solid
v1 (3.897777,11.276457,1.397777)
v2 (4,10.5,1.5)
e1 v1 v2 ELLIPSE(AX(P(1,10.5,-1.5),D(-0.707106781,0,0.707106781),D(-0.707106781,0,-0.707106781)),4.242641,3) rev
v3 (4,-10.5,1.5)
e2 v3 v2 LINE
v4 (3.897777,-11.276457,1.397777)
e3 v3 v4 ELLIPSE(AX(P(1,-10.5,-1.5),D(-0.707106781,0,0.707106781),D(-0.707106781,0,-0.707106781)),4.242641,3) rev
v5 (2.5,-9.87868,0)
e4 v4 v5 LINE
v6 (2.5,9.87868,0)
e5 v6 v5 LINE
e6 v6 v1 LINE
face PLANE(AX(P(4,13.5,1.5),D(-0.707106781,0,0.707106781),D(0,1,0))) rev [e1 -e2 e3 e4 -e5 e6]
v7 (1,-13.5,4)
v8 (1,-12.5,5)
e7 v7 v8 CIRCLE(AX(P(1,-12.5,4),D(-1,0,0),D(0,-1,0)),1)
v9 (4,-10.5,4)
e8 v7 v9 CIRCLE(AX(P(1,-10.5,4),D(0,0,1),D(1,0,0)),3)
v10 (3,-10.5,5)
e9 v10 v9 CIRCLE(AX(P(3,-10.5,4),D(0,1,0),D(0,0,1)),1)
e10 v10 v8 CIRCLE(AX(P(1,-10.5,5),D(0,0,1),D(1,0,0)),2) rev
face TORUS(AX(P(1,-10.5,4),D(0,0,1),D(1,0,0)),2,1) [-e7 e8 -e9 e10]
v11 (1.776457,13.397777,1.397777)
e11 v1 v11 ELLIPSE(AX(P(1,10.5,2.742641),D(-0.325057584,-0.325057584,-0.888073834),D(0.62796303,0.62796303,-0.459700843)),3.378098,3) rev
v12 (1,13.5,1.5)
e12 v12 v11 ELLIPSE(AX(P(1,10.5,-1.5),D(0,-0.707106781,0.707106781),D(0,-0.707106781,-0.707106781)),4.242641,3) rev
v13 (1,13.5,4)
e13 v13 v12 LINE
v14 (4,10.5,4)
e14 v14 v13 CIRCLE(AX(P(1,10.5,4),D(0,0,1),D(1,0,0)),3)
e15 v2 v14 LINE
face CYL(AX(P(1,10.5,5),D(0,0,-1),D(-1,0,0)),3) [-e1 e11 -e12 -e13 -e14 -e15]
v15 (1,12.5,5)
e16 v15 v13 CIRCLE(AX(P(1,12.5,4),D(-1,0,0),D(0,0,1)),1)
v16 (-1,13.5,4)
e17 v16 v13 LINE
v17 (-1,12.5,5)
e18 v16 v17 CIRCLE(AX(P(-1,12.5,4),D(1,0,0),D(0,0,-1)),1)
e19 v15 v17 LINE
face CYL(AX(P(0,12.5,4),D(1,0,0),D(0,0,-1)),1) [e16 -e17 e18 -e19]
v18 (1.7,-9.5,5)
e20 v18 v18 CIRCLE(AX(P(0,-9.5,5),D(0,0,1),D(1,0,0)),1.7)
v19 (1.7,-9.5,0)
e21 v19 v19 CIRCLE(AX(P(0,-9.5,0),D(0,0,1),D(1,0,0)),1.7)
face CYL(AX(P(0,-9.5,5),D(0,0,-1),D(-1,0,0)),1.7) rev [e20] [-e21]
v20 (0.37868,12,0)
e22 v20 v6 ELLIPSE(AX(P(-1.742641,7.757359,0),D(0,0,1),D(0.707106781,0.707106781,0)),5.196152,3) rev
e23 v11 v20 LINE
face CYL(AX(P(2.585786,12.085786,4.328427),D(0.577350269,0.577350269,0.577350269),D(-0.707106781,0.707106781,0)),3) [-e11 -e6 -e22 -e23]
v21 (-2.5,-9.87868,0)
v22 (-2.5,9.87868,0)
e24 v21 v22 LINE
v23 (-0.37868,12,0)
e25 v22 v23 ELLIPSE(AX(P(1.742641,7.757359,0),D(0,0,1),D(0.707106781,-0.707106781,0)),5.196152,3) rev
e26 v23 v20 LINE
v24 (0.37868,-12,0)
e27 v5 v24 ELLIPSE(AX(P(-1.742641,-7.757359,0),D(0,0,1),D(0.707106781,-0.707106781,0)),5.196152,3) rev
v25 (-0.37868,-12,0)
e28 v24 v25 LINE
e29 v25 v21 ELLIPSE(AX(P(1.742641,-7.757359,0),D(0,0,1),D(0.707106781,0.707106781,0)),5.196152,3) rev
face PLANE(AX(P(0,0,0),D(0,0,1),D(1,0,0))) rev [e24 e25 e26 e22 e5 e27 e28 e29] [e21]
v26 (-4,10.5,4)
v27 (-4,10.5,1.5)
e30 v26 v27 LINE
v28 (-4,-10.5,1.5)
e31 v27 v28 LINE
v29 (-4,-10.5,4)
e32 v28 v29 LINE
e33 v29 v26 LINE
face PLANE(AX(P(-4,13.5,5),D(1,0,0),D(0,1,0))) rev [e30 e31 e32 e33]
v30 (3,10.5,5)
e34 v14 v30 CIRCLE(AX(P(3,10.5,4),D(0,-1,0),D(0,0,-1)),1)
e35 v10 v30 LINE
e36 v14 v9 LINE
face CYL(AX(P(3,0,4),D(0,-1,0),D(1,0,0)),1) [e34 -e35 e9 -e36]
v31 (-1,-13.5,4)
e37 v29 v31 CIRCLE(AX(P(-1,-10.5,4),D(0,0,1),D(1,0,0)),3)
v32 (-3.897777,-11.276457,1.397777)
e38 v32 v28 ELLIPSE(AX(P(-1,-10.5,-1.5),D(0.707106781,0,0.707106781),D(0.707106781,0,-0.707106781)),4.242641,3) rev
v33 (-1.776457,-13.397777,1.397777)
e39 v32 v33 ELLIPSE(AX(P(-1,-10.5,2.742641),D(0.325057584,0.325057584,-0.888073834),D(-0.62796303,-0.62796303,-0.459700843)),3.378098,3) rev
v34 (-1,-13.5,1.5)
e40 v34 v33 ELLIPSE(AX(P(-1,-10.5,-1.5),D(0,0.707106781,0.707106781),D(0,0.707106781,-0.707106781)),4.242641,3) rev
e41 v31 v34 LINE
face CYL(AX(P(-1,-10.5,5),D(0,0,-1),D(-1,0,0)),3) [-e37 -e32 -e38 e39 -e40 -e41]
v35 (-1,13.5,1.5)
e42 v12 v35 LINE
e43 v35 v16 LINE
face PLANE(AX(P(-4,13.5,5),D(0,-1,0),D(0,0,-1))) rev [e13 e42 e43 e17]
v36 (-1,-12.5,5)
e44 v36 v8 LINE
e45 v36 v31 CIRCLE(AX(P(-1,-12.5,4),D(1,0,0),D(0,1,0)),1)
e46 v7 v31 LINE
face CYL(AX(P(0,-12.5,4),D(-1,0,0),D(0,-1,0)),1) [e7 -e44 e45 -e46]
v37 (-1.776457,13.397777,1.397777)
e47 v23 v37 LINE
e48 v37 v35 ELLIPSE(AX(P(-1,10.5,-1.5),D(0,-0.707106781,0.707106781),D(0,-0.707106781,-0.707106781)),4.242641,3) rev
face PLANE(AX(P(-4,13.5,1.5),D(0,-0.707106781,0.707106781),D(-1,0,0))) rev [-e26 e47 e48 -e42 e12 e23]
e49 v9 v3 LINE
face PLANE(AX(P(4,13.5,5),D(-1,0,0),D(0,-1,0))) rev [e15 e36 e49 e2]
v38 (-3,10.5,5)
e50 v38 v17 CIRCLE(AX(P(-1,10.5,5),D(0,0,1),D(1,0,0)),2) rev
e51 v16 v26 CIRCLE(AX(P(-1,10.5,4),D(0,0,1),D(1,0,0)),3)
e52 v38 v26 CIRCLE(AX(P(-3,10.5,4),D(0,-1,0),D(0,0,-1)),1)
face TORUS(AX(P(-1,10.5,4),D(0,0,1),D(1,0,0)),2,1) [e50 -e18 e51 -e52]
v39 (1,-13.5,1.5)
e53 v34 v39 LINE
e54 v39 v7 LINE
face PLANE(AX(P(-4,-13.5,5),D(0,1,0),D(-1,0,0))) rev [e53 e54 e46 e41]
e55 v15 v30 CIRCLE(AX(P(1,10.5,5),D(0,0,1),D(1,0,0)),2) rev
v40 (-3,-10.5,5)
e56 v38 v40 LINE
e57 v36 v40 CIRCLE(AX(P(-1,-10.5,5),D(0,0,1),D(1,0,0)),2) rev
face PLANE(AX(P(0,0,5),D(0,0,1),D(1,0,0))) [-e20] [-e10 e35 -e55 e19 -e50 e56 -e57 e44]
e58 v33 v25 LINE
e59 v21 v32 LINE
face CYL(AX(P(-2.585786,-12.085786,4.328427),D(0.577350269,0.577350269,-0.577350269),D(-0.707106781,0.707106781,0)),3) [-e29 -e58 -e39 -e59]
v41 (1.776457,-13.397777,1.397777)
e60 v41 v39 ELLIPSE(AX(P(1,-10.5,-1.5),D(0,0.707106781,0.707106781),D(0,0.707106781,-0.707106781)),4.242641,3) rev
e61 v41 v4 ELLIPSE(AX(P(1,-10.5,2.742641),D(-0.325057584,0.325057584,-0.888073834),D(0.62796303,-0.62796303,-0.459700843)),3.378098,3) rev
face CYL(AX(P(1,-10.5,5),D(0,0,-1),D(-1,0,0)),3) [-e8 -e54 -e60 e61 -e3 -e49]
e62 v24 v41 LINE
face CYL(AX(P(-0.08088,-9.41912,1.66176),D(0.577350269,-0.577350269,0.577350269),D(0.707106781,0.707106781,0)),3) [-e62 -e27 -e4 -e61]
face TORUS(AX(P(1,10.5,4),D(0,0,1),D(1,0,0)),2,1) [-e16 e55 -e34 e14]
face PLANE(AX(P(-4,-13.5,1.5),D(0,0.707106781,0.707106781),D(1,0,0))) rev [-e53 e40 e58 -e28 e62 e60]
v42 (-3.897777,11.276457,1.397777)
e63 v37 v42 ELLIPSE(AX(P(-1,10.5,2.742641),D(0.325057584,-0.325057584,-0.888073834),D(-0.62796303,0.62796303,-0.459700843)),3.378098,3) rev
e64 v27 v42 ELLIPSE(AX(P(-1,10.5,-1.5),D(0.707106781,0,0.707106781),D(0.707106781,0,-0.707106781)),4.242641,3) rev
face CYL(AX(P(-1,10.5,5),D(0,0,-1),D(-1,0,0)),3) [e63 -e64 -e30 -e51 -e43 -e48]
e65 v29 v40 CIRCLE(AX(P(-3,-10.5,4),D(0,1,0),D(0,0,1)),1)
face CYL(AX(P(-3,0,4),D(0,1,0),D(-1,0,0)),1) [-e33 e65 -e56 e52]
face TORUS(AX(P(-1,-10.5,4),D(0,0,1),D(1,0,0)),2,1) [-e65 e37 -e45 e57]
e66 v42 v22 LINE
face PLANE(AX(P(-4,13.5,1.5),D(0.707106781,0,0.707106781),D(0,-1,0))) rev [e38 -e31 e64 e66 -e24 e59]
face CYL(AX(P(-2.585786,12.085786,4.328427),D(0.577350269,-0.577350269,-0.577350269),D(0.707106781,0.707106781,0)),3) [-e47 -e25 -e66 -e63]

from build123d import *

# Parameters (mm, degrees)
SKETCH1_W           = 8
SKETCH1_H           = 27
SKETCH1_R           = 1.7
BOSS_EXTRUDE1_DEPTH = 5
CHAMFER1_SIZE       = 1.5
FILLET1_R           = 1
FILLET2_R           = 3


with BuildPart() as part:
    # Sketch1 → Boss-Extrude1 (new body)
    with BuildSketch(Plane.XY):
        Rectangle(SKETCH1_W, SKETCH1_H)
        with Locations((0, -9.5)):
            Circle(SKETCH1_R, mode=Mode.SUBTRACT)
    extrude(amount=BOSS_EXTRUDE1_DEPTH)

    # Chamfer1
    chamfer1_edges = [part.edges().sort_by_distance(p)[0] for p in [
        (0, -13.5, 0),
        (-4, 0, 0),
        (0, 13.5, 0),
        (4, 0, 0),
    ]]
    chamfer(chamfer1_edges, length=CHAMFER1_SIZE)

    # Fillet1
    fillet1_edges = [part.edges().sort_by_distance(p)[0] for p in [
        (-4, 0, 5),
        (0, -13.5, 5),
        (4, 0, 5),
        (0, 13.5, 5),
    ]]
    fillet(fillet1_edges, radius=FILLET1_R)

    # Fillet2
    # the kernel refuses this fillet: 3 mm, written as the material it takes off along each edge
    with BuildSketch(Plane(origin=(-1, 10.5, 5), x_dir=(0, 1, 0), z_dir=(1, 0, 0))) as fillet2_piece_1:
        with BuildLine():
            CenterArc((2, -1), 1, 0, 90)
            Line((3, -1), (3, 0))
            Line((3, 0), (2, 0))
        make_face()
    revolve(axis=Axis((-1, 10.5, 5), (0, 0, 1)), revolution_arc=90, mode=Mode.SUBTRACT)
    with BuildSketch(Plane(origin=(1, 10.5, 5), x_dir=(1, 0, 0), z_dir=(0, -1, 0))) as fillet2_piece_2:
        with BuildLine():
            CenterArc((2, -1), 1, 0, 90)
            Line((3, -1), (3, 0))
            Line((3, 0), (2, 0))
        make_face()
    revolve(axis=Axis((1, 10.5, 5), (0, 0, 1)), revolution_arc=90, mode=Mode.SUBTRACT)
    with BuildSketch(Plane(origin=(-1, -10.5, 5), x_dir=(-1, 0, 0), z_dir=(0, 1, 0))) as fillet2_piece_3:
        with BuildLine():
            CenterArc((2, -1), 1, 0, 90)
            Line((3, -1), (3, 0))
            Line((3, 0), (2, 0))
        make_face()
    revolve(axis=Axis((-1, -10.5, 5), (0, 0, 1)), revolution_arc=90, mode=Mode.SUBTRACT)
    with BuildSketch(Plane(origin=(1, -10.5, 5), x_dir=(0, -1, 0), z_dir=(-1, 0, 0))) as fillet2_piece_4:
        with BuildLine():
            CenterArc((2, -1), 1, 0, 90)
            Line((3, -1), (3, 0))
            Line((3, 0), (2, 0))
        make_face()
    revolve(axis=Axis((1, -10.5, 5), (0, 0, 1)), revolution_arc=90, mode=Mode.SUBTRACT)
    with BuildSketch(Plane(origin=(-6.5, 16, 4), x_dir=(0.816496580927726, 0.40824829046386274, 0.40824829046386324), z_dir=(0.5773502691896258, -0.5773502691896258, -0.5773502691896258)), Plane(origin=(-6.5, -16, 4), x_dir=(-0.4082482904638628, 0.816496580927726, 0.40824829046386335), z_dir=(0.5773502691896257, 0.5773502691896258, -0.5773502691896257))) as fillet2_piece_5:
        with BuildLine():
            CenterArc((FILLET2_R * 0.57735026919, FILLET2_R), FILLET2_R, 210, 60)
            Line((-FILLET2_R * 0.288675134595, FILLET2_R * 0.5), (0, 0))
            Line((0, 0), (FILLET2_R * 0.57735026919, 0))
        make_face()
    extrude(amount=11.258330249, mode=Mode.SUBTRACT)
    with BuildSketch(Plane(origin=(6.5, 16, 4), x_dir=(-0.8164965809277261, 0.4082482904638628, 0.4082482904638633), z_dir=(-0.5773502691896258, -0.5773502691896258, -0.5773502691896258)), Plane(origin=(6.5, -16, 4), x_dir=(0.4082482904638627, 0.8164965809277261, 0.4082482904638632), z_dir=(-0.5773502691896258, 0.5773502691896257, -0.5773502691896258))) as fillet2_piece_6:
        with BuildLine():
            CenterArc((FILLET2_R * 0.57735026919, -FILLET2_R), FILLET2_R, 90, 60)
            Line((-FILLET2_R * 0.288675134595, -FILLET2_R * 0.5), (0, 0))
            Line((0, 0), (FILLET2_R * 0.57735026919, 0))
        make_face()
    extrude(amount=11.258330249, mode=Mode.SUBTRACT)
    with BuildSketch(Plane(origin=(-4, -13.5, -6), x_dir=(0, 1, 0), z_dir=(0, 0, 1)), Plane(origin=(-4, 13.5, -6), x_dir=(1, 0, 0), z_dir=(0, 0, 1))) as fillet2_piece_7:
        with BuildLine():
            CenterArc((FILLET2_R, -FILLET2_R), FILLET2_R, 90, 90)
            Line((0, -FILLET2_R), (0, 0))
            Line((0, 0), (FILLET2_R, 0))
        make_face()
    extrude(amount=11, mode=Mode.SUBTRACT)
    with BuildSketch(Plane(origin=(4, -13.5, -6), x_dir=(0, 1, 0), z_dir=(0, 0, 1)), Plane(origin=(4, 13.5, -6), x_dir=(-1, 0, 0), z_dir=(0, 0, 1))) as fillet2_piece_8:
        with BuildLine():
            CenterArc((FILLET2_R, FILLET2_R), FILLET2_R, 180, 90)
            Line((0, FILLET2_R), (0, 0))
            Line((0, 0), (FILLET2_R, 0))
        make_face()
    extrude(amount=11, mode=Mode.SUBTRACT)


solid = part.part
